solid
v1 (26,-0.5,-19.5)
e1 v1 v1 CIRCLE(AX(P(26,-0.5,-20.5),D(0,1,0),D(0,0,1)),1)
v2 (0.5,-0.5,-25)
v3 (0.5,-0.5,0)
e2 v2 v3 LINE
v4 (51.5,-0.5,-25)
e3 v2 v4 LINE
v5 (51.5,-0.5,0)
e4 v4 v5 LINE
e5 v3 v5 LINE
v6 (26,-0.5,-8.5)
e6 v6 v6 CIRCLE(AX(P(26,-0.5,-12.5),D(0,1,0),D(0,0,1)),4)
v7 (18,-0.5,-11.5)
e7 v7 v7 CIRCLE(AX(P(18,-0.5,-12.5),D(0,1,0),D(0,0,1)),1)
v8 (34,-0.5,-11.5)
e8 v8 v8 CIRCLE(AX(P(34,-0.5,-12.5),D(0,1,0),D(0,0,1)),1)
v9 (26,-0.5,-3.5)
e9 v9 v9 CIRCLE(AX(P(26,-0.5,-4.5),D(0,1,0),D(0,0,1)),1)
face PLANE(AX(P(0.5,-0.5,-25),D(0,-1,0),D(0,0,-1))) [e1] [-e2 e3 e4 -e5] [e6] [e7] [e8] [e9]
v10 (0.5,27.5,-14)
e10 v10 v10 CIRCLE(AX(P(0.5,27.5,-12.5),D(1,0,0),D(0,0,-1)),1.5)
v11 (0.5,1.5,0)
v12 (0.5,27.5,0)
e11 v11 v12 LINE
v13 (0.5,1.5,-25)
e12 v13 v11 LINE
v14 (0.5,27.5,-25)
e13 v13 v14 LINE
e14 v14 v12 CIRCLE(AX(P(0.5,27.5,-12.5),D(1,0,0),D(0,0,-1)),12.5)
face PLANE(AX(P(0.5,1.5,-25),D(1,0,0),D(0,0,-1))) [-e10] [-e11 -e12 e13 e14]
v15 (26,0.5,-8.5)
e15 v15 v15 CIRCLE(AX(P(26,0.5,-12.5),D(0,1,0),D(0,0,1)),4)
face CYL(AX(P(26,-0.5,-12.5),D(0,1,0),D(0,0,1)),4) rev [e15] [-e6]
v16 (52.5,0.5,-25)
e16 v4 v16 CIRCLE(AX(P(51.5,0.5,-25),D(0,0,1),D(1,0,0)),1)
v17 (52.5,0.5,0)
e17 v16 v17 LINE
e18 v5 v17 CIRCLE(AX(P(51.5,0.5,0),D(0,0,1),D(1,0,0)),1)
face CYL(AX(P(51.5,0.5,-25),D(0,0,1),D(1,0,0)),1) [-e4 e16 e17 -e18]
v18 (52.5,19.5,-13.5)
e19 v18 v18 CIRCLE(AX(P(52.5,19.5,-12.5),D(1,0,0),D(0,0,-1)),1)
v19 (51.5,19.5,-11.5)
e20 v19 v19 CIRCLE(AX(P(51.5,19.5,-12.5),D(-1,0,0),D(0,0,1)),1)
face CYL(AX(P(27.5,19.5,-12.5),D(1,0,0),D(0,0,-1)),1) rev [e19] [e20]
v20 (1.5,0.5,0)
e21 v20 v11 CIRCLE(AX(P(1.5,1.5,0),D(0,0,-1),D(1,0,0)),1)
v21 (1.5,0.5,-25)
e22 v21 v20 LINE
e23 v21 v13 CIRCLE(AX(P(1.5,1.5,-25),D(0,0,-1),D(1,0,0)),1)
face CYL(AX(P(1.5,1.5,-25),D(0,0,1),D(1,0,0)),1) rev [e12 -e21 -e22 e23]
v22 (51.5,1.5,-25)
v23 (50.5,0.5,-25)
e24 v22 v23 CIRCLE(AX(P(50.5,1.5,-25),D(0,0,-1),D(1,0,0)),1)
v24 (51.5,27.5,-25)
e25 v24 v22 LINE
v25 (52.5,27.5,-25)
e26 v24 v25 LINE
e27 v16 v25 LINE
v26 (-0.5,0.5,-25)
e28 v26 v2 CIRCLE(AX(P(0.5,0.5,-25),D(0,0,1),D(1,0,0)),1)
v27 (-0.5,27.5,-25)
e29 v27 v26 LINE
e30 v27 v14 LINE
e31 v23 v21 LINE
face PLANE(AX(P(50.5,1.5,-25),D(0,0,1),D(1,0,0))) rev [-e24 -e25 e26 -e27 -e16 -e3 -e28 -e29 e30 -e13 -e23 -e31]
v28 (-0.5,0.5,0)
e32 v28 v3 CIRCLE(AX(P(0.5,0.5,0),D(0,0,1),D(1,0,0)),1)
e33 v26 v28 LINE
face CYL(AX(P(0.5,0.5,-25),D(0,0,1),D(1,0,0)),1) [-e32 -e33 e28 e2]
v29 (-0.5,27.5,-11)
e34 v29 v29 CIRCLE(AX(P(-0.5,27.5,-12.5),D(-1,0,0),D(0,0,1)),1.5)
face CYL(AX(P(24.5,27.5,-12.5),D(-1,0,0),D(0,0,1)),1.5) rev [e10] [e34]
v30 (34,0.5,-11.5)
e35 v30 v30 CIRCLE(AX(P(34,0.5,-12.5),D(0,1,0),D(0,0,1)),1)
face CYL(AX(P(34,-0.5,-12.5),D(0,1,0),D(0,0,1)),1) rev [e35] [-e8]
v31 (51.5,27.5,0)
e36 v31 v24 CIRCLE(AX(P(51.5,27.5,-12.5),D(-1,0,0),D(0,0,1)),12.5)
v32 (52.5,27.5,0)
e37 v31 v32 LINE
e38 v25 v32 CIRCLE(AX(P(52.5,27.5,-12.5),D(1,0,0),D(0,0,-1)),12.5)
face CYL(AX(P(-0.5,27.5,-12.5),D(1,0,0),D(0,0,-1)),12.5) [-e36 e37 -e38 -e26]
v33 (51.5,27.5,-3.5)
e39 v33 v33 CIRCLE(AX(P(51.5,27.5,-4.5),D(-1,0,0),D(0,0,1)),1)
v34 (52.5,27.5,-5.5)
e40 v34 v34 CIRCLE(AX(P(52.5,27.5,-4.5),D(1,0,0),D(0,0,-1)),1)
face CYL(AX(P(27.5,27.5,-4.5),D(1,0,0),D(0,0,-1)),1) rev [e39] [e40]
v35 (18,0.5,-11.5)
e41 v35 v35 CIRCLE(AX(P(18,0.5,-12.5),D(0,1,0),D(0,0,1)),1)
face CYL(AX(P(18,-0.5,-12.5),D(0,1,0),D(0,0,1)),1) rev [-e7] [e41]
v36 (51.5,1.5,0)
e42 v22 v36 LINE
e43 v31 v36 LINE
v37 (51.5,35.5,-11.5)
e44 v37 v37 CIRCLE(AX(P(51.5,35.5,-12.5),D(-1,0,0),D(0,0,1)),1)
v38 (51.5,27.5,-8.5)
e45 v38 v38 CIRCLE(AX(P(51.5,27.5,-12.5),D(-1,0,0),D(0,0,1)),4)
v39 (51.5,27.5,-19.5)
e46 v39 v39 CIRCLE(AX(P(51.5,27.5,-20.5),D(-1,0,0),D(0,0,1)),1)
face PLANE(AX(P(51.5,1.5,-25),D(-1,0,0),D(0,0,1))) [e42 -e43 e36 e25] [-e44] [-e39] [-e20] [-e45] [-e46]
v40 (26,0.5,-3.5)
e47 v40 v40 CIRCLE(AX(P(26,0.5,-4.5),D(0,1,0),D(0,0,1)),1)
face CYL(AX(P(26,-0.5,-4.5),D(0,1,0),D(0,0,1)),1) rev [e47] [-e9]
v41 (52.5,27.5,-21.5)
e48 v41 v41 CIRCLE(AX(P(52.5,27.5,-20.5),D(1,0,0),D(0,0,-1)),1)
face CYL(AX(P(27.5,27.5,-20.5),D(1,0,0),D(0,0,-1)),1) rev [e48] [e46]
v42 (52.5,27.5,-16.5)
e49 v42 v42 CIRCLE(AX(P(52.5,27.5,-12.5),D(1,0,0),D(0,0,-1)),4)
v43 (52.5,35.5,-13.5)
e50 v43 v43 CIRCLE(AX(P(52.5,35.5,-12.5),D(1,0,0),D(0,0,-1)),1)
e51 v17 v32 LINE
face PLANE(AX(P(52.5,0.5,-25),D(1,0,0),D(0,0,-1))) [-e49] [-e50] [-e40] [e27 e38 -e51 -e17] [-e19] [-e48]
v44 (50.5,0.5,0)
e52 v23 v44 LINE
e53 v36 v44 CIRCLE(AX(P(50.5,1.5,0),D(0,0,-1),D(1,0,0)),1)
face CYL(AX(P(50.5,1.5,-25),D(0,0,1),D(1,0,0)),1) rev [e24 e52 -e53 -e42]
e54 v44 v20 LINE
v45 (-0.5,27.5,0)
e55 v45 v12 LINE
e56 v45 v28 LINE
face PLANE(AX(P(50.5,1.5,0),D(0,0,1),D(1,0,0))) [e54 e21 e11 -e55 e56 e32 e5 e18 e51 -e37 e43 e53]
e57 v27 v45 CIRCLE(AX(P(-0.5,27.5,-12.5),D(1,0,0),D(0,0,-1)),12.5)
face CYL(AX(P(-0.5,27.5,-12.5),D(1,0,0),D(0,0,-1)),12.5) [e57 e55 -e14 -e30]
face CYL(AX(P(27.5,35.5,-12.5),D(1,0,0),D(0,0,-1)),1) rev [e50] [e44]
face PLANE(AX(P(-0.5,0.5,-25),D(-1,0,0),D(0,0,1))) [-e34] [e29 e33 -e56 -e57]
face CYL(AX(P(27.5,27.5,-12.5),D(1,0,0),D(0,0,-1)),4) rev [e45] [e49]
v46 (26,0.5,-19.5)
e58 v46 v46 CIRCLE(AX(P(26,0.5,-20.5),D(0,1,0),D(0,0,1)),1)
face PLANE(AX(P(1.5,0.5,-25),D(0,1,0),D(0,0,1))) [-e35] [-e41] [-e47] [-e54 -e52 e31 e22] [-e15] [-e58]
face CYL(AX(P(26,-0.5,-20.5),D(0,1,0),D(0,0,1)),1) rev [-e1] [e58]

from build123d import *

# Parameters (mm, degrees)
BOSS_EXTRUDE1_DEPTH = 25
CUT_EXTRUDE1_DEPTH  = 71.9506871
SKETCH3_R           = 4
SKETCH3_R_2         = 1
CUT_EXTRUDE2_DEPTH  = 71.295803573
SKETCH4_R           = 4
SKETCH4_R_2         = 1
CUT_EXTRUDE3_DEPTH  = 25
SKETCH5_R           = 1.5
CUT_EXTRUDE4_DEPTH  = 25


with BuildPart() as part:
    # Sketch1 → Boss-Extrude1 (new body)
    with BuildSketch(Plane.XY):
        with BuildLine():
            Line((-0.5, 40), (0.5, 40))
            Line((0.5, 40), (0.5, 1.5))
            ThreePointArc((0.5, 1.5), (0.792893219, 0.792893219), (1.5, 0.5))
            Line((1.5, 0.5), (50.5, 0.5))
            ThreePointArc((50.5, 0.5), (51.207106781, 0.792893219), (51.5, 1.5))
            Line((51.5, 1.5), (51.5, 40))
            Line((51.5, 40), (52.5, 40))
            Line((52.5, 40), (52.5, 0.5))
            ThreePointArc((52.5, 0.5), (52.207106781, -0.207106781), (51.5, -0.5))
            Line((51.5, -0.5), (0.5, -0.5))
            ThreePointArc((0.5, -0.5), (-0.207106781, -0.207106781), (-0.5, 0.5))
            Line((-0.5, 0.5), (-0.5, 40))
        make_face()
    extrude(amount=-BOSS_EXTRUDE1_DEPTH)

    # Sketch2 → Cut-Extrude1 (cut, through all)
    with BuildSketch(Plane(origin=(52.5, 0, 0), x_dir=(0, 0, -1), z_dir=(1, 0, 0))):
        with BuildLine():
            Line((25, 40), (12.5, 40))
            ThreePointArc((12.5, 40), (21.338834765, 36.338834765), (25, 27.5))
            Line((25, 27.5), (25, 40))
        make_face()
        with BuildLine():
            Line((0, 40), (0, 27.5))
            ThreePointArc((0, 27.5), (3.661165235, 36.338834765), (12.5, 40))
            Line((12.5, 40), (0, 40))
        make_face()
    extrude(amount=-CUT_EXTRUDE1_DEPTH, mode=Mode.SUBTRACT)

    # Sketch3 → Cut-Extrude2 (cut, through all)
    with BuildSketch(Plane(origin=(0, 0.5, 0), x_dir=(1, 0, 0), z_dir=(0, 1, 0))):
        with Locations((26, 12.5)):
            Circle(SKETCH3_R)
        with Locations((34, 12.5)):
            Circle(SKETCH3_R_2)
        with Locations((26, 20.5)):
            Circle(SKETCH3_R_2)
        with Locations((26, 4.5)):
            Circle(SKETCH3_R_2)
        with Locations((18, 12.5)):
            Circle(SKETCH3_R_2)
    extrude(amount=-CUT_EXTRUDE2_DEPTH, mode=Mode.SUBTRACT)

    # Sketch4 → Cut-Extrude3 (cut)
    with BuildSketch(Plane(origin=(52.5, 0, 0), x_dir=(0, 0, -1), z_dir=(1, 0, 0))):
        with Locations((12.5, 27.5)):
            Circle(SKETCH4_R)
        with Locations((20.5, 27.5)):
            Circle(SKETCH4_R_2)
        with Locations((12.5, 35.5)):
            Circle(SKETCH4_R_2)
        with Locations((12.5, 19.5)):
            Circle(SKETCH4_R_2)
        with Locations((4.5, 27.5)):
            Circle(SKETCH4_R_2)
    extrude(amount=-CUT_EXTRUDE3_DEPTH, mode=Mode.SUBTRACT)

    # Sketch5 → Cut-Extrude4 (cut)
    with BuildSketch(Plane.ZY.offset(0.5)):
        with Locations((-12.5, 27.5)):
            Circle(SKETCH5_R)
    extrude(amount=-CUT_EXTRUDE4_DEPTH, mode=Mode.SUBTRACT)


solid = part.part
